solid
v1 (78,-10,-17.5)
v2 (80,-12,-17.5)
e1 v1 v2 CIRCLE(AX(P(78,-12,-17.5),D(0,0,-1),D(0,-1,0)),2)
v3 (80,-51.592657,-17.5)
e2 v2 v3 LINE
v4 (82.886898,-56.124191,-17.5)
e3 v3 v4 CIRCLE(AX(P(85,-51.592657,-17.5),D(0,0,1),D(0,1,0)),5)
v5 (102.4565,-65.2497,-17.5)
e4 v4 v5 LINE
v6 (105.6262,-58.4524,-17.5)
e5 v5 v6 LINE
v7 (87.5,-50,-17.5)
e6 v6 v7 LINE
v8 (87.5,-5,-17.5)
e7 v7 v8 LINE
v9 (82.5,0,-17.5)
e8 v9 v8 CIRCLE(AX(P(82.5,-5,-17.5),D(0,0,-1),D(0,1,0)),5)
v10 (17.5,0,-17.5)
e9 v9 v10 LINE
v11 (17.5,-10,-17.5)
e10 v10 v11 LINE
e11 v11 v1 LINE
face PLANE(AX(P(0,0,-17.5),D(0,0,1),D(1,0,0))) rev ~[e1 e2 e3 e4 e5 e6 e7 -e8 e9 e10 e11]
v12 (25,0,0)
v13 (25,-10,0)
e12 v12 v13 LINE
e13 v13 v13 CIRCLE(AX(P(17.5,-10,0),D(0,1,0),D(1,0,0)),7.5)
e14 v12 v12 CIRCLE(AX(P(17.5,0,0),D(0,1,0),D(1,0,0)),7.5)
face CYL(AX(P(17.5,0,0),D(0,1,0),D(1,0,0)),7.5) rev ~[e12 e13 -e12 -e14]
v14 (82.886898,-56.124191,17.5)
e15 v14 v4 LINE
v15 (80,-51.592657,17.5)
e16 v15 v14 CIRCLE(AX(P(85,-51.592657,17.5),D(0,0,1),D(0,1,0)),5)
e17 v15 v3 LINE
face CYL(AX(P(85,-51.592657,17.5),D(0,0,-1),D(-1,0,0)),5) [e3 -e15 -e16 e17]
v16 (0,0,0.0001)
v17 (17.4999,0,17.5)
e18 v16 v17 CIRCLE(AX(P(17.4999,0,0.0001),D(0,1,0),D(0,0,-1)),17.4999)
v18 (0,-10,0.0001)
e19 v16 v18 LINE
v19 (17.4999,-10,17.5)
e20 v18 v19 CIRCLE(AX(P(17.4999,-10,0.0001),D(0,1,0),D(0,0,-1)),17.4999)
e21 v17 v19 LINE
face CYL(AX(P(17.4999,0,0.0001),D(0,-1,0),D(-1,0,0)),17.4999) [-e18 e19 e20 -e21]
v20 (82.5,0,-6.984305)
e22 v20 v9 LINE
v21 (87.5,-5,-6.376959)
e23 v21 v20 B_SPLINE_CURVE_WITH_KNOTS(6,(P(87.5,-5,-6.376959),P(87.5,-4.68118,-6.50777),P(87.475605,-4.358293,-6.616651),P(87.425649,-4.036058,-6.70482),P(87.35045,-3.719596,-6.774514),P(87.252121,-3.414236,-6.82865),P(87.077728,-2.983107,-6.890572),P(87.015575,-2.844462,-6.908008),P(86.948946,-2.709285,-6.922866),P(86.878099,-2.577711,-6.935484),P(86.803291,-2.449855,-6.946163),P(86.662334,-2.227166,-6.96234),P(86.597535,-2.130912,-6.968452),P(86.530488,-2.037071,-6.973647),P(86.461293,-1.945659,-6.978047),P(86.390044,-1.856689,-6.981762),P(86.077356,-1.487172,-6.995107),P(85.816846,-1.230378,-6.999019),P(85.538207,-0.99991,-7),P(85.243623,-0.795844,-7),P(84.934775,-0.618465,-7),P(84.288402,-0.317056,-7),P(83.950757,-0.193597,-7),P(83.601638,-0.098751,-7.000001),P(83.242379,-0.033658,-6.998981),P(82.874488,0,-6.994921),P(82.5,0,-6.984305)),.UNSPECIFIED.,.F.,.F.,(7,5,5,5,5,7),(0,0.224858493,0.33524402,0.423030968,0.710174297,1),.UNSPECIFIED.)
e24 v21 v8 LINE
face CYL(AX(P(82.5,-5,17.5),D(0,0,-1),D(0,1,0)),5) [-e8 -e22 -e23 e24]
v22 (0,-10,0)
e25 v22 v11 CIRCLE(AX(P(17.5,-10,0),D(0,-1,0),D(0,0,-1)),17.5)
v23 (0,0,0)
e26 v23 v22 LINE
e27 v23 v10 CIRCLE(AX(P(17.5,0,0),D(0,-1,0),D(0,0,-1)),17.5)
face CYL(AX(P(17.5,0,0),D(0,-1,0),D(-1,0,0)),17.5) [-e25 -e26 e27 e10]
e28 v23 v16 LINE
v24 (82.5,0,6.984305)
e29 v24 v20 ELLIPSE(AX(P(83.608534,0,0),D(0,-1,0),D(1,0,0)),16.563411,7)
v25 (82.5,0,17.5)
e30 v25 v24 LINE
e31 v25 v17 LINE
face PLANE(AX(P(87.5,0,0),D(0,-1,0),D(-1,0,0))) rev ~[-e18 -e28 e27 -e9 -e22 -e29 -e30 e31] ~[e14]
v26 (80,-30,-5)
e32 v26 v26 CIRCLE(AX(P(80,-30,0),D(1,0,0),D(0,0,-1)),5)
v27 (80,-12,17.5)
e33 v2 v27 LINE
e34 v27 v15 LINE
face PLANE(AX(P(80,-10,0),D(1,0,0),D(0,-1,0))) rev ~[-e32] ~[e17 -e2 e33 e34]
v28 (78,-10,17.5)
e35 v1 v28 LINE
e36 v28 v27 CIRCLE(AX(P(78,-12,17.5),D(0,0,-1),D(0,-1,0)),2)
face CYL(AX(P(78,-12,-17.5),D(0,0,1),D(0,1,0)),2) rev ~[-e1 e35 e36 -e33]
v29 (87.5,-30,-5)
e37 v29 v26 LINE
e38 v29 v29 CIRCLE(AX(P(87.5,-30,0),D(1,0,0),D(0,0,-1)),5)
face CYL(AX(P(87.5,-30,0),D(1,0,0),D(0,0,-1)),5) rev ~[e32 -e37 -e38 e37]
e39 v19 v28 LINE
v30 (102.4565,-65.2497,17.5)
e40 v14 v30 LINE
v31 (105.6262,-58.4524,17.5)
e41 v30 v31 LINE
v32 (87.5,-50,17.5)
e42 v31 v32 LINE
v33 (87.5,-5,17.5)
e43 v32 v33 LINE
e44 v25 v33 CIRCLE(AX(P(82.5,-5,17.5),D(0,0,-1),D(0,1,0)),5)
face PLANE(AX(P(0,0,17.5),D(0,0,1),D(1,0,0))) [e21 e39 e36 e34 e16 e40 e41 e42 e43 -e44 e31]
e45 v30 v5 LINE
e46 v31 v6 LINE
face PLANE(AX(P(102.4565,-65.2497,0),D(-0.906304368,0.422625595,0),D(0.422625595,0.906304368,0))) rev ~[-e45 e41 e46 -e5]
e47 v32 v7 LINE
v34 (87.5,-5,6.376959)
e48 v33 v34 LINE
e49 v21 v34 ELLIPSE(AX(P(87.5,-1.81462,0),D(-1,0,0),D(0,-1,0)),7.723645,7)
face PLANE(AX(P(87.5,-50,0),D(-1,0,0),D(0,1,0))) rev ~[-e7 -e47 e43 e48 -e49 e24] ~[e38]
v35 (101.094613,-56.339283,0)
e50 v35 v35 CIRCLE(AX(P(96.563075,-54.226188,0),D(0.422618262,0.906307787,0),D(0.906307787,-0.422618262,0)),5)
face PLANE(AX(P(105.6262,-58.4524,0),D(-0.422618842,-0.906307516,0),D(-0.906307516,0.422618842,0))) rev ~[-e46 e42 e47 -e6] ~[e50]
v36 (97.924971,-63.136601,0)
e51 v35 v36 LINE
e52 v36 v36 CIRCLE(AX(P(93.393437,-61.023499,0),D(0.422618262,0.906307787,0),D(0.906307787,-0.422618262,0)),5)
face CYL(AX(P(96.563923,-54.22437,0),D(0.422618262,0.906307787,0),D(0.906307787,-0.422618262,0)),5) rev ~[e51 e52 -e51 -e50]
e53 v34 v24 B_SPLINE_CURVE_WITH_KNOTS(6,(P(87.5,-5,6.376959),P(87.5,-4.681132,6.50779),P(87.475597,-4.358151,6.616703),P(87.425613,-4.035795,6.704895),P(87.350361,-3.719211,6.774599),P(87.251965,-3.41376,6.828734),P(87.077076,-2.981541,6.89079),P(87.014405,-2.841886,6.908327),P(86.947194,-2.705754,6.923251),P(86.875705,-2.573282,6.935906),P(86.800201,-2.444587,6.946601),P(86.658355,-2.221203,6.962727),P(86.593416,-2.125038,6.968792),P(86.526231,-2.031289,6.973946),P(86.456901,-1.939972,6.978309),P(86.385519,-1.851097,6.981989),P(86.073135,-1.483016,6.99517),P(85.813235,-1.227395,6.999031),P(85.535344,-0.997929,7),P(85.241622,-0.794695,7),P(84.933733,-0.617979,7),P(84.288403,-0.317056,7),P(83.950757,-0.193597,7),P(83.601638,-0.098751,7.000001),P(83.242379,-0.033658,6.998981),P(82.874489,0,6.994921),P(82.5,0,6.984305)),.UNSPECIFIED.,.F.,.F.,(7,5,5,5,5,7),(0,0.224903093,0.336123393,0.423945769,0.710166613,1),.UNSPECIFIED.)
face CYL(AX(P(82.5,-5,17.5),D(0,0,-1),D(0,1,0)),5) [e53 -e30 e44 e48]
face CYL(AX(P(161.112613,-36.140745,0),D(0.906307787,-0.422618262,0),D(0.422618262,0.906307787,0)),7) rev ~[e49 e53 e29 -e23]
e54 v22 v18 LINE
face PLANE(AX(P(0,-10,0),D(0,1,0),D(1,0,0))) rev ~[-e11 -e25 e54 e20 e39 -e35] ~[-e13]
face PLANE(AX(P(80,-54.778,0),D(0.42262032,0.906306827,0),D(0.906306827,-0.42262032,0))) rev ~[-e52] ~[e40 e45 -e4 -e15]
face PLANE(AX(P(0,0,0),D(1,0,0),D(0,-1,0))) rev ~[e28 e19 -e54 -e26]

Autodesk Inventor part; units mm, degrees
ref_plane "YZ Plane" through (0, 0, 0) normal (1, 0, 0) x (0, 1, 0)
ref_plane "XZ Plane" through (0, 0, 0) normal (0, 1, 0) x (-1, 0, 0)
ref_plane "XY Plane" through (0, 0, 0) normal (0, 0, 1) x (1, 0, 0)
sketch "스케치1" plane through (0, 0, 0) normal (0, 0, 1) x (1, 0, 0)
  line L0 (0, 0) -> (0, -10)
  line L1 (0, -10) -> (80, -10)
  line L2 (80, -10) -> (80, -54.778)
  line L3 (80, -54.778) -> (102.4565, -65.2497)
  line L4 (102.4565, -65.2497) -> (105.6262, -58.4524)
  line L5 (105.6262, -58.4524) -> (87.5, -50)
  line L6 (87.5, -50) -> (87.5, 0)
  line L7 (87.5, 0) -> (0, 0)
  dimension "d5" = 7.5
  dimension "d7" = 20
  dimension "d9" = 7.5
  dimension "d10" = 50
  dimension "d11" = 10
  dimension "d12" = 115
  dimension "d13" = 87.5
extrude "돌출1" add sketch "스케치1" along normal mid plane 35
fillet "모깎기1" radius 17.5 1 edges at (0, -5, -17.5)
fillet "모깎기2" radius 17.5 1 edges at (0, -5, 17.5)
fillet "모깎기3" radius 2 1 edges at (80, -10, 0)
fillet "모깎기5" radius 5 1 edges at (80, -54.778, 0)
sketch "스케치3" plane through (87.5, 0, 17.5) normal (0, 1, 0) x (1, 0, 0)
  arc A0 (-70, 35) -> (-70, 0) centre (-70, 17.5) ccw projected
  circle A1 centre (-70, 17.5) radius 7.5
  point P0 (-87.5, 17.5)
  dimension "d22" = 15
sketch "스케치4" plane through (87.5, -50, 17.5) normal (0.4226183, 0.9063078, 0) x (0.9063078, -0.4226183, 0)
  circle A0 centre (10, 17.5) radius 5
  line L0 (0, 35) -> (0, 0) projected
  point P0 (-100.4328, 17.5)
  dimension "d23" = 10
  dimension "d24" = 10
ref_plane "작업 평면1" through (0, 0, 0) normal (0, 0, 1) x (1, 0, 0)
fillet "모깎기7" radius 5 1 edges at (87.5, 0, 0)
sketch "스케치6" plane through (0, 0, 0) normal (0, 0, 1) x (1, 0, 0)
  line L0 (37.61, 21.4494) -> (161.1108, -36.1399)
  arc A0 (87.5, -5) -> (82.5, 0) centre (82.5, -5) ccw projected
  line L1 (17.5, 0) -> (82.5, 0) projected
  point P0 (0, 0)
  dimension "d26" = 25
ref_plane "작업 평면2" through (161.1108, -36.1399, 0) normal (0.9063078, -0.4226183, 0) x (0.4226183, 0.9063078, 0)
sketch "스케치7" plane through (161.1108, -36.1399, 0) normal (0.9063078, -0.4226183, 0) x (0.4226183, 0.9063078, 0)
  point P0 (-35.3345, 0)
sketch "스케치8" plane through (161.1108, -36.1399, 0) normal (0.9063078, -0.4226183, 0) x (0.4226183, 0.9063078, 0)
  point P0 (-35.3345, 0)
sketch "스케치9" plane through (161.1108, -36.1399, 0) normal (0.9063078, -0.4226183, 0) x (0.4226183, 0.9063078, 0)
  line L0 (0, -17.5) -> (0, 17.5) projected
  circle A0 centre (0, 0) radius 7
  point P0 (-35.3345, 0)
  dimension "d27" = 14
extrude "돌출2" cut sketch "스케치9" against normal blind 200
extrude "돌출3" cut sketch "스케치3" against normal blind 200
extrude "돌출4" cut sketch "스케치4" against normal blind 200
sketch "스케치10" plane through (87.5, -50, 17.5) normal (1, 0, 0) x (0, 0, -1)
  circle A0 centre (17.5, 20) radius 5
  line L0 (10.5157, 50) -> (24.4843, 50) projected
  point P0 (17.5, 50)
  dimension "d34" = 10
  dimension "d35" = 30
extrude "돌출5" cut sketch "스케치10" against normal blind 60
properties part number "3번"
